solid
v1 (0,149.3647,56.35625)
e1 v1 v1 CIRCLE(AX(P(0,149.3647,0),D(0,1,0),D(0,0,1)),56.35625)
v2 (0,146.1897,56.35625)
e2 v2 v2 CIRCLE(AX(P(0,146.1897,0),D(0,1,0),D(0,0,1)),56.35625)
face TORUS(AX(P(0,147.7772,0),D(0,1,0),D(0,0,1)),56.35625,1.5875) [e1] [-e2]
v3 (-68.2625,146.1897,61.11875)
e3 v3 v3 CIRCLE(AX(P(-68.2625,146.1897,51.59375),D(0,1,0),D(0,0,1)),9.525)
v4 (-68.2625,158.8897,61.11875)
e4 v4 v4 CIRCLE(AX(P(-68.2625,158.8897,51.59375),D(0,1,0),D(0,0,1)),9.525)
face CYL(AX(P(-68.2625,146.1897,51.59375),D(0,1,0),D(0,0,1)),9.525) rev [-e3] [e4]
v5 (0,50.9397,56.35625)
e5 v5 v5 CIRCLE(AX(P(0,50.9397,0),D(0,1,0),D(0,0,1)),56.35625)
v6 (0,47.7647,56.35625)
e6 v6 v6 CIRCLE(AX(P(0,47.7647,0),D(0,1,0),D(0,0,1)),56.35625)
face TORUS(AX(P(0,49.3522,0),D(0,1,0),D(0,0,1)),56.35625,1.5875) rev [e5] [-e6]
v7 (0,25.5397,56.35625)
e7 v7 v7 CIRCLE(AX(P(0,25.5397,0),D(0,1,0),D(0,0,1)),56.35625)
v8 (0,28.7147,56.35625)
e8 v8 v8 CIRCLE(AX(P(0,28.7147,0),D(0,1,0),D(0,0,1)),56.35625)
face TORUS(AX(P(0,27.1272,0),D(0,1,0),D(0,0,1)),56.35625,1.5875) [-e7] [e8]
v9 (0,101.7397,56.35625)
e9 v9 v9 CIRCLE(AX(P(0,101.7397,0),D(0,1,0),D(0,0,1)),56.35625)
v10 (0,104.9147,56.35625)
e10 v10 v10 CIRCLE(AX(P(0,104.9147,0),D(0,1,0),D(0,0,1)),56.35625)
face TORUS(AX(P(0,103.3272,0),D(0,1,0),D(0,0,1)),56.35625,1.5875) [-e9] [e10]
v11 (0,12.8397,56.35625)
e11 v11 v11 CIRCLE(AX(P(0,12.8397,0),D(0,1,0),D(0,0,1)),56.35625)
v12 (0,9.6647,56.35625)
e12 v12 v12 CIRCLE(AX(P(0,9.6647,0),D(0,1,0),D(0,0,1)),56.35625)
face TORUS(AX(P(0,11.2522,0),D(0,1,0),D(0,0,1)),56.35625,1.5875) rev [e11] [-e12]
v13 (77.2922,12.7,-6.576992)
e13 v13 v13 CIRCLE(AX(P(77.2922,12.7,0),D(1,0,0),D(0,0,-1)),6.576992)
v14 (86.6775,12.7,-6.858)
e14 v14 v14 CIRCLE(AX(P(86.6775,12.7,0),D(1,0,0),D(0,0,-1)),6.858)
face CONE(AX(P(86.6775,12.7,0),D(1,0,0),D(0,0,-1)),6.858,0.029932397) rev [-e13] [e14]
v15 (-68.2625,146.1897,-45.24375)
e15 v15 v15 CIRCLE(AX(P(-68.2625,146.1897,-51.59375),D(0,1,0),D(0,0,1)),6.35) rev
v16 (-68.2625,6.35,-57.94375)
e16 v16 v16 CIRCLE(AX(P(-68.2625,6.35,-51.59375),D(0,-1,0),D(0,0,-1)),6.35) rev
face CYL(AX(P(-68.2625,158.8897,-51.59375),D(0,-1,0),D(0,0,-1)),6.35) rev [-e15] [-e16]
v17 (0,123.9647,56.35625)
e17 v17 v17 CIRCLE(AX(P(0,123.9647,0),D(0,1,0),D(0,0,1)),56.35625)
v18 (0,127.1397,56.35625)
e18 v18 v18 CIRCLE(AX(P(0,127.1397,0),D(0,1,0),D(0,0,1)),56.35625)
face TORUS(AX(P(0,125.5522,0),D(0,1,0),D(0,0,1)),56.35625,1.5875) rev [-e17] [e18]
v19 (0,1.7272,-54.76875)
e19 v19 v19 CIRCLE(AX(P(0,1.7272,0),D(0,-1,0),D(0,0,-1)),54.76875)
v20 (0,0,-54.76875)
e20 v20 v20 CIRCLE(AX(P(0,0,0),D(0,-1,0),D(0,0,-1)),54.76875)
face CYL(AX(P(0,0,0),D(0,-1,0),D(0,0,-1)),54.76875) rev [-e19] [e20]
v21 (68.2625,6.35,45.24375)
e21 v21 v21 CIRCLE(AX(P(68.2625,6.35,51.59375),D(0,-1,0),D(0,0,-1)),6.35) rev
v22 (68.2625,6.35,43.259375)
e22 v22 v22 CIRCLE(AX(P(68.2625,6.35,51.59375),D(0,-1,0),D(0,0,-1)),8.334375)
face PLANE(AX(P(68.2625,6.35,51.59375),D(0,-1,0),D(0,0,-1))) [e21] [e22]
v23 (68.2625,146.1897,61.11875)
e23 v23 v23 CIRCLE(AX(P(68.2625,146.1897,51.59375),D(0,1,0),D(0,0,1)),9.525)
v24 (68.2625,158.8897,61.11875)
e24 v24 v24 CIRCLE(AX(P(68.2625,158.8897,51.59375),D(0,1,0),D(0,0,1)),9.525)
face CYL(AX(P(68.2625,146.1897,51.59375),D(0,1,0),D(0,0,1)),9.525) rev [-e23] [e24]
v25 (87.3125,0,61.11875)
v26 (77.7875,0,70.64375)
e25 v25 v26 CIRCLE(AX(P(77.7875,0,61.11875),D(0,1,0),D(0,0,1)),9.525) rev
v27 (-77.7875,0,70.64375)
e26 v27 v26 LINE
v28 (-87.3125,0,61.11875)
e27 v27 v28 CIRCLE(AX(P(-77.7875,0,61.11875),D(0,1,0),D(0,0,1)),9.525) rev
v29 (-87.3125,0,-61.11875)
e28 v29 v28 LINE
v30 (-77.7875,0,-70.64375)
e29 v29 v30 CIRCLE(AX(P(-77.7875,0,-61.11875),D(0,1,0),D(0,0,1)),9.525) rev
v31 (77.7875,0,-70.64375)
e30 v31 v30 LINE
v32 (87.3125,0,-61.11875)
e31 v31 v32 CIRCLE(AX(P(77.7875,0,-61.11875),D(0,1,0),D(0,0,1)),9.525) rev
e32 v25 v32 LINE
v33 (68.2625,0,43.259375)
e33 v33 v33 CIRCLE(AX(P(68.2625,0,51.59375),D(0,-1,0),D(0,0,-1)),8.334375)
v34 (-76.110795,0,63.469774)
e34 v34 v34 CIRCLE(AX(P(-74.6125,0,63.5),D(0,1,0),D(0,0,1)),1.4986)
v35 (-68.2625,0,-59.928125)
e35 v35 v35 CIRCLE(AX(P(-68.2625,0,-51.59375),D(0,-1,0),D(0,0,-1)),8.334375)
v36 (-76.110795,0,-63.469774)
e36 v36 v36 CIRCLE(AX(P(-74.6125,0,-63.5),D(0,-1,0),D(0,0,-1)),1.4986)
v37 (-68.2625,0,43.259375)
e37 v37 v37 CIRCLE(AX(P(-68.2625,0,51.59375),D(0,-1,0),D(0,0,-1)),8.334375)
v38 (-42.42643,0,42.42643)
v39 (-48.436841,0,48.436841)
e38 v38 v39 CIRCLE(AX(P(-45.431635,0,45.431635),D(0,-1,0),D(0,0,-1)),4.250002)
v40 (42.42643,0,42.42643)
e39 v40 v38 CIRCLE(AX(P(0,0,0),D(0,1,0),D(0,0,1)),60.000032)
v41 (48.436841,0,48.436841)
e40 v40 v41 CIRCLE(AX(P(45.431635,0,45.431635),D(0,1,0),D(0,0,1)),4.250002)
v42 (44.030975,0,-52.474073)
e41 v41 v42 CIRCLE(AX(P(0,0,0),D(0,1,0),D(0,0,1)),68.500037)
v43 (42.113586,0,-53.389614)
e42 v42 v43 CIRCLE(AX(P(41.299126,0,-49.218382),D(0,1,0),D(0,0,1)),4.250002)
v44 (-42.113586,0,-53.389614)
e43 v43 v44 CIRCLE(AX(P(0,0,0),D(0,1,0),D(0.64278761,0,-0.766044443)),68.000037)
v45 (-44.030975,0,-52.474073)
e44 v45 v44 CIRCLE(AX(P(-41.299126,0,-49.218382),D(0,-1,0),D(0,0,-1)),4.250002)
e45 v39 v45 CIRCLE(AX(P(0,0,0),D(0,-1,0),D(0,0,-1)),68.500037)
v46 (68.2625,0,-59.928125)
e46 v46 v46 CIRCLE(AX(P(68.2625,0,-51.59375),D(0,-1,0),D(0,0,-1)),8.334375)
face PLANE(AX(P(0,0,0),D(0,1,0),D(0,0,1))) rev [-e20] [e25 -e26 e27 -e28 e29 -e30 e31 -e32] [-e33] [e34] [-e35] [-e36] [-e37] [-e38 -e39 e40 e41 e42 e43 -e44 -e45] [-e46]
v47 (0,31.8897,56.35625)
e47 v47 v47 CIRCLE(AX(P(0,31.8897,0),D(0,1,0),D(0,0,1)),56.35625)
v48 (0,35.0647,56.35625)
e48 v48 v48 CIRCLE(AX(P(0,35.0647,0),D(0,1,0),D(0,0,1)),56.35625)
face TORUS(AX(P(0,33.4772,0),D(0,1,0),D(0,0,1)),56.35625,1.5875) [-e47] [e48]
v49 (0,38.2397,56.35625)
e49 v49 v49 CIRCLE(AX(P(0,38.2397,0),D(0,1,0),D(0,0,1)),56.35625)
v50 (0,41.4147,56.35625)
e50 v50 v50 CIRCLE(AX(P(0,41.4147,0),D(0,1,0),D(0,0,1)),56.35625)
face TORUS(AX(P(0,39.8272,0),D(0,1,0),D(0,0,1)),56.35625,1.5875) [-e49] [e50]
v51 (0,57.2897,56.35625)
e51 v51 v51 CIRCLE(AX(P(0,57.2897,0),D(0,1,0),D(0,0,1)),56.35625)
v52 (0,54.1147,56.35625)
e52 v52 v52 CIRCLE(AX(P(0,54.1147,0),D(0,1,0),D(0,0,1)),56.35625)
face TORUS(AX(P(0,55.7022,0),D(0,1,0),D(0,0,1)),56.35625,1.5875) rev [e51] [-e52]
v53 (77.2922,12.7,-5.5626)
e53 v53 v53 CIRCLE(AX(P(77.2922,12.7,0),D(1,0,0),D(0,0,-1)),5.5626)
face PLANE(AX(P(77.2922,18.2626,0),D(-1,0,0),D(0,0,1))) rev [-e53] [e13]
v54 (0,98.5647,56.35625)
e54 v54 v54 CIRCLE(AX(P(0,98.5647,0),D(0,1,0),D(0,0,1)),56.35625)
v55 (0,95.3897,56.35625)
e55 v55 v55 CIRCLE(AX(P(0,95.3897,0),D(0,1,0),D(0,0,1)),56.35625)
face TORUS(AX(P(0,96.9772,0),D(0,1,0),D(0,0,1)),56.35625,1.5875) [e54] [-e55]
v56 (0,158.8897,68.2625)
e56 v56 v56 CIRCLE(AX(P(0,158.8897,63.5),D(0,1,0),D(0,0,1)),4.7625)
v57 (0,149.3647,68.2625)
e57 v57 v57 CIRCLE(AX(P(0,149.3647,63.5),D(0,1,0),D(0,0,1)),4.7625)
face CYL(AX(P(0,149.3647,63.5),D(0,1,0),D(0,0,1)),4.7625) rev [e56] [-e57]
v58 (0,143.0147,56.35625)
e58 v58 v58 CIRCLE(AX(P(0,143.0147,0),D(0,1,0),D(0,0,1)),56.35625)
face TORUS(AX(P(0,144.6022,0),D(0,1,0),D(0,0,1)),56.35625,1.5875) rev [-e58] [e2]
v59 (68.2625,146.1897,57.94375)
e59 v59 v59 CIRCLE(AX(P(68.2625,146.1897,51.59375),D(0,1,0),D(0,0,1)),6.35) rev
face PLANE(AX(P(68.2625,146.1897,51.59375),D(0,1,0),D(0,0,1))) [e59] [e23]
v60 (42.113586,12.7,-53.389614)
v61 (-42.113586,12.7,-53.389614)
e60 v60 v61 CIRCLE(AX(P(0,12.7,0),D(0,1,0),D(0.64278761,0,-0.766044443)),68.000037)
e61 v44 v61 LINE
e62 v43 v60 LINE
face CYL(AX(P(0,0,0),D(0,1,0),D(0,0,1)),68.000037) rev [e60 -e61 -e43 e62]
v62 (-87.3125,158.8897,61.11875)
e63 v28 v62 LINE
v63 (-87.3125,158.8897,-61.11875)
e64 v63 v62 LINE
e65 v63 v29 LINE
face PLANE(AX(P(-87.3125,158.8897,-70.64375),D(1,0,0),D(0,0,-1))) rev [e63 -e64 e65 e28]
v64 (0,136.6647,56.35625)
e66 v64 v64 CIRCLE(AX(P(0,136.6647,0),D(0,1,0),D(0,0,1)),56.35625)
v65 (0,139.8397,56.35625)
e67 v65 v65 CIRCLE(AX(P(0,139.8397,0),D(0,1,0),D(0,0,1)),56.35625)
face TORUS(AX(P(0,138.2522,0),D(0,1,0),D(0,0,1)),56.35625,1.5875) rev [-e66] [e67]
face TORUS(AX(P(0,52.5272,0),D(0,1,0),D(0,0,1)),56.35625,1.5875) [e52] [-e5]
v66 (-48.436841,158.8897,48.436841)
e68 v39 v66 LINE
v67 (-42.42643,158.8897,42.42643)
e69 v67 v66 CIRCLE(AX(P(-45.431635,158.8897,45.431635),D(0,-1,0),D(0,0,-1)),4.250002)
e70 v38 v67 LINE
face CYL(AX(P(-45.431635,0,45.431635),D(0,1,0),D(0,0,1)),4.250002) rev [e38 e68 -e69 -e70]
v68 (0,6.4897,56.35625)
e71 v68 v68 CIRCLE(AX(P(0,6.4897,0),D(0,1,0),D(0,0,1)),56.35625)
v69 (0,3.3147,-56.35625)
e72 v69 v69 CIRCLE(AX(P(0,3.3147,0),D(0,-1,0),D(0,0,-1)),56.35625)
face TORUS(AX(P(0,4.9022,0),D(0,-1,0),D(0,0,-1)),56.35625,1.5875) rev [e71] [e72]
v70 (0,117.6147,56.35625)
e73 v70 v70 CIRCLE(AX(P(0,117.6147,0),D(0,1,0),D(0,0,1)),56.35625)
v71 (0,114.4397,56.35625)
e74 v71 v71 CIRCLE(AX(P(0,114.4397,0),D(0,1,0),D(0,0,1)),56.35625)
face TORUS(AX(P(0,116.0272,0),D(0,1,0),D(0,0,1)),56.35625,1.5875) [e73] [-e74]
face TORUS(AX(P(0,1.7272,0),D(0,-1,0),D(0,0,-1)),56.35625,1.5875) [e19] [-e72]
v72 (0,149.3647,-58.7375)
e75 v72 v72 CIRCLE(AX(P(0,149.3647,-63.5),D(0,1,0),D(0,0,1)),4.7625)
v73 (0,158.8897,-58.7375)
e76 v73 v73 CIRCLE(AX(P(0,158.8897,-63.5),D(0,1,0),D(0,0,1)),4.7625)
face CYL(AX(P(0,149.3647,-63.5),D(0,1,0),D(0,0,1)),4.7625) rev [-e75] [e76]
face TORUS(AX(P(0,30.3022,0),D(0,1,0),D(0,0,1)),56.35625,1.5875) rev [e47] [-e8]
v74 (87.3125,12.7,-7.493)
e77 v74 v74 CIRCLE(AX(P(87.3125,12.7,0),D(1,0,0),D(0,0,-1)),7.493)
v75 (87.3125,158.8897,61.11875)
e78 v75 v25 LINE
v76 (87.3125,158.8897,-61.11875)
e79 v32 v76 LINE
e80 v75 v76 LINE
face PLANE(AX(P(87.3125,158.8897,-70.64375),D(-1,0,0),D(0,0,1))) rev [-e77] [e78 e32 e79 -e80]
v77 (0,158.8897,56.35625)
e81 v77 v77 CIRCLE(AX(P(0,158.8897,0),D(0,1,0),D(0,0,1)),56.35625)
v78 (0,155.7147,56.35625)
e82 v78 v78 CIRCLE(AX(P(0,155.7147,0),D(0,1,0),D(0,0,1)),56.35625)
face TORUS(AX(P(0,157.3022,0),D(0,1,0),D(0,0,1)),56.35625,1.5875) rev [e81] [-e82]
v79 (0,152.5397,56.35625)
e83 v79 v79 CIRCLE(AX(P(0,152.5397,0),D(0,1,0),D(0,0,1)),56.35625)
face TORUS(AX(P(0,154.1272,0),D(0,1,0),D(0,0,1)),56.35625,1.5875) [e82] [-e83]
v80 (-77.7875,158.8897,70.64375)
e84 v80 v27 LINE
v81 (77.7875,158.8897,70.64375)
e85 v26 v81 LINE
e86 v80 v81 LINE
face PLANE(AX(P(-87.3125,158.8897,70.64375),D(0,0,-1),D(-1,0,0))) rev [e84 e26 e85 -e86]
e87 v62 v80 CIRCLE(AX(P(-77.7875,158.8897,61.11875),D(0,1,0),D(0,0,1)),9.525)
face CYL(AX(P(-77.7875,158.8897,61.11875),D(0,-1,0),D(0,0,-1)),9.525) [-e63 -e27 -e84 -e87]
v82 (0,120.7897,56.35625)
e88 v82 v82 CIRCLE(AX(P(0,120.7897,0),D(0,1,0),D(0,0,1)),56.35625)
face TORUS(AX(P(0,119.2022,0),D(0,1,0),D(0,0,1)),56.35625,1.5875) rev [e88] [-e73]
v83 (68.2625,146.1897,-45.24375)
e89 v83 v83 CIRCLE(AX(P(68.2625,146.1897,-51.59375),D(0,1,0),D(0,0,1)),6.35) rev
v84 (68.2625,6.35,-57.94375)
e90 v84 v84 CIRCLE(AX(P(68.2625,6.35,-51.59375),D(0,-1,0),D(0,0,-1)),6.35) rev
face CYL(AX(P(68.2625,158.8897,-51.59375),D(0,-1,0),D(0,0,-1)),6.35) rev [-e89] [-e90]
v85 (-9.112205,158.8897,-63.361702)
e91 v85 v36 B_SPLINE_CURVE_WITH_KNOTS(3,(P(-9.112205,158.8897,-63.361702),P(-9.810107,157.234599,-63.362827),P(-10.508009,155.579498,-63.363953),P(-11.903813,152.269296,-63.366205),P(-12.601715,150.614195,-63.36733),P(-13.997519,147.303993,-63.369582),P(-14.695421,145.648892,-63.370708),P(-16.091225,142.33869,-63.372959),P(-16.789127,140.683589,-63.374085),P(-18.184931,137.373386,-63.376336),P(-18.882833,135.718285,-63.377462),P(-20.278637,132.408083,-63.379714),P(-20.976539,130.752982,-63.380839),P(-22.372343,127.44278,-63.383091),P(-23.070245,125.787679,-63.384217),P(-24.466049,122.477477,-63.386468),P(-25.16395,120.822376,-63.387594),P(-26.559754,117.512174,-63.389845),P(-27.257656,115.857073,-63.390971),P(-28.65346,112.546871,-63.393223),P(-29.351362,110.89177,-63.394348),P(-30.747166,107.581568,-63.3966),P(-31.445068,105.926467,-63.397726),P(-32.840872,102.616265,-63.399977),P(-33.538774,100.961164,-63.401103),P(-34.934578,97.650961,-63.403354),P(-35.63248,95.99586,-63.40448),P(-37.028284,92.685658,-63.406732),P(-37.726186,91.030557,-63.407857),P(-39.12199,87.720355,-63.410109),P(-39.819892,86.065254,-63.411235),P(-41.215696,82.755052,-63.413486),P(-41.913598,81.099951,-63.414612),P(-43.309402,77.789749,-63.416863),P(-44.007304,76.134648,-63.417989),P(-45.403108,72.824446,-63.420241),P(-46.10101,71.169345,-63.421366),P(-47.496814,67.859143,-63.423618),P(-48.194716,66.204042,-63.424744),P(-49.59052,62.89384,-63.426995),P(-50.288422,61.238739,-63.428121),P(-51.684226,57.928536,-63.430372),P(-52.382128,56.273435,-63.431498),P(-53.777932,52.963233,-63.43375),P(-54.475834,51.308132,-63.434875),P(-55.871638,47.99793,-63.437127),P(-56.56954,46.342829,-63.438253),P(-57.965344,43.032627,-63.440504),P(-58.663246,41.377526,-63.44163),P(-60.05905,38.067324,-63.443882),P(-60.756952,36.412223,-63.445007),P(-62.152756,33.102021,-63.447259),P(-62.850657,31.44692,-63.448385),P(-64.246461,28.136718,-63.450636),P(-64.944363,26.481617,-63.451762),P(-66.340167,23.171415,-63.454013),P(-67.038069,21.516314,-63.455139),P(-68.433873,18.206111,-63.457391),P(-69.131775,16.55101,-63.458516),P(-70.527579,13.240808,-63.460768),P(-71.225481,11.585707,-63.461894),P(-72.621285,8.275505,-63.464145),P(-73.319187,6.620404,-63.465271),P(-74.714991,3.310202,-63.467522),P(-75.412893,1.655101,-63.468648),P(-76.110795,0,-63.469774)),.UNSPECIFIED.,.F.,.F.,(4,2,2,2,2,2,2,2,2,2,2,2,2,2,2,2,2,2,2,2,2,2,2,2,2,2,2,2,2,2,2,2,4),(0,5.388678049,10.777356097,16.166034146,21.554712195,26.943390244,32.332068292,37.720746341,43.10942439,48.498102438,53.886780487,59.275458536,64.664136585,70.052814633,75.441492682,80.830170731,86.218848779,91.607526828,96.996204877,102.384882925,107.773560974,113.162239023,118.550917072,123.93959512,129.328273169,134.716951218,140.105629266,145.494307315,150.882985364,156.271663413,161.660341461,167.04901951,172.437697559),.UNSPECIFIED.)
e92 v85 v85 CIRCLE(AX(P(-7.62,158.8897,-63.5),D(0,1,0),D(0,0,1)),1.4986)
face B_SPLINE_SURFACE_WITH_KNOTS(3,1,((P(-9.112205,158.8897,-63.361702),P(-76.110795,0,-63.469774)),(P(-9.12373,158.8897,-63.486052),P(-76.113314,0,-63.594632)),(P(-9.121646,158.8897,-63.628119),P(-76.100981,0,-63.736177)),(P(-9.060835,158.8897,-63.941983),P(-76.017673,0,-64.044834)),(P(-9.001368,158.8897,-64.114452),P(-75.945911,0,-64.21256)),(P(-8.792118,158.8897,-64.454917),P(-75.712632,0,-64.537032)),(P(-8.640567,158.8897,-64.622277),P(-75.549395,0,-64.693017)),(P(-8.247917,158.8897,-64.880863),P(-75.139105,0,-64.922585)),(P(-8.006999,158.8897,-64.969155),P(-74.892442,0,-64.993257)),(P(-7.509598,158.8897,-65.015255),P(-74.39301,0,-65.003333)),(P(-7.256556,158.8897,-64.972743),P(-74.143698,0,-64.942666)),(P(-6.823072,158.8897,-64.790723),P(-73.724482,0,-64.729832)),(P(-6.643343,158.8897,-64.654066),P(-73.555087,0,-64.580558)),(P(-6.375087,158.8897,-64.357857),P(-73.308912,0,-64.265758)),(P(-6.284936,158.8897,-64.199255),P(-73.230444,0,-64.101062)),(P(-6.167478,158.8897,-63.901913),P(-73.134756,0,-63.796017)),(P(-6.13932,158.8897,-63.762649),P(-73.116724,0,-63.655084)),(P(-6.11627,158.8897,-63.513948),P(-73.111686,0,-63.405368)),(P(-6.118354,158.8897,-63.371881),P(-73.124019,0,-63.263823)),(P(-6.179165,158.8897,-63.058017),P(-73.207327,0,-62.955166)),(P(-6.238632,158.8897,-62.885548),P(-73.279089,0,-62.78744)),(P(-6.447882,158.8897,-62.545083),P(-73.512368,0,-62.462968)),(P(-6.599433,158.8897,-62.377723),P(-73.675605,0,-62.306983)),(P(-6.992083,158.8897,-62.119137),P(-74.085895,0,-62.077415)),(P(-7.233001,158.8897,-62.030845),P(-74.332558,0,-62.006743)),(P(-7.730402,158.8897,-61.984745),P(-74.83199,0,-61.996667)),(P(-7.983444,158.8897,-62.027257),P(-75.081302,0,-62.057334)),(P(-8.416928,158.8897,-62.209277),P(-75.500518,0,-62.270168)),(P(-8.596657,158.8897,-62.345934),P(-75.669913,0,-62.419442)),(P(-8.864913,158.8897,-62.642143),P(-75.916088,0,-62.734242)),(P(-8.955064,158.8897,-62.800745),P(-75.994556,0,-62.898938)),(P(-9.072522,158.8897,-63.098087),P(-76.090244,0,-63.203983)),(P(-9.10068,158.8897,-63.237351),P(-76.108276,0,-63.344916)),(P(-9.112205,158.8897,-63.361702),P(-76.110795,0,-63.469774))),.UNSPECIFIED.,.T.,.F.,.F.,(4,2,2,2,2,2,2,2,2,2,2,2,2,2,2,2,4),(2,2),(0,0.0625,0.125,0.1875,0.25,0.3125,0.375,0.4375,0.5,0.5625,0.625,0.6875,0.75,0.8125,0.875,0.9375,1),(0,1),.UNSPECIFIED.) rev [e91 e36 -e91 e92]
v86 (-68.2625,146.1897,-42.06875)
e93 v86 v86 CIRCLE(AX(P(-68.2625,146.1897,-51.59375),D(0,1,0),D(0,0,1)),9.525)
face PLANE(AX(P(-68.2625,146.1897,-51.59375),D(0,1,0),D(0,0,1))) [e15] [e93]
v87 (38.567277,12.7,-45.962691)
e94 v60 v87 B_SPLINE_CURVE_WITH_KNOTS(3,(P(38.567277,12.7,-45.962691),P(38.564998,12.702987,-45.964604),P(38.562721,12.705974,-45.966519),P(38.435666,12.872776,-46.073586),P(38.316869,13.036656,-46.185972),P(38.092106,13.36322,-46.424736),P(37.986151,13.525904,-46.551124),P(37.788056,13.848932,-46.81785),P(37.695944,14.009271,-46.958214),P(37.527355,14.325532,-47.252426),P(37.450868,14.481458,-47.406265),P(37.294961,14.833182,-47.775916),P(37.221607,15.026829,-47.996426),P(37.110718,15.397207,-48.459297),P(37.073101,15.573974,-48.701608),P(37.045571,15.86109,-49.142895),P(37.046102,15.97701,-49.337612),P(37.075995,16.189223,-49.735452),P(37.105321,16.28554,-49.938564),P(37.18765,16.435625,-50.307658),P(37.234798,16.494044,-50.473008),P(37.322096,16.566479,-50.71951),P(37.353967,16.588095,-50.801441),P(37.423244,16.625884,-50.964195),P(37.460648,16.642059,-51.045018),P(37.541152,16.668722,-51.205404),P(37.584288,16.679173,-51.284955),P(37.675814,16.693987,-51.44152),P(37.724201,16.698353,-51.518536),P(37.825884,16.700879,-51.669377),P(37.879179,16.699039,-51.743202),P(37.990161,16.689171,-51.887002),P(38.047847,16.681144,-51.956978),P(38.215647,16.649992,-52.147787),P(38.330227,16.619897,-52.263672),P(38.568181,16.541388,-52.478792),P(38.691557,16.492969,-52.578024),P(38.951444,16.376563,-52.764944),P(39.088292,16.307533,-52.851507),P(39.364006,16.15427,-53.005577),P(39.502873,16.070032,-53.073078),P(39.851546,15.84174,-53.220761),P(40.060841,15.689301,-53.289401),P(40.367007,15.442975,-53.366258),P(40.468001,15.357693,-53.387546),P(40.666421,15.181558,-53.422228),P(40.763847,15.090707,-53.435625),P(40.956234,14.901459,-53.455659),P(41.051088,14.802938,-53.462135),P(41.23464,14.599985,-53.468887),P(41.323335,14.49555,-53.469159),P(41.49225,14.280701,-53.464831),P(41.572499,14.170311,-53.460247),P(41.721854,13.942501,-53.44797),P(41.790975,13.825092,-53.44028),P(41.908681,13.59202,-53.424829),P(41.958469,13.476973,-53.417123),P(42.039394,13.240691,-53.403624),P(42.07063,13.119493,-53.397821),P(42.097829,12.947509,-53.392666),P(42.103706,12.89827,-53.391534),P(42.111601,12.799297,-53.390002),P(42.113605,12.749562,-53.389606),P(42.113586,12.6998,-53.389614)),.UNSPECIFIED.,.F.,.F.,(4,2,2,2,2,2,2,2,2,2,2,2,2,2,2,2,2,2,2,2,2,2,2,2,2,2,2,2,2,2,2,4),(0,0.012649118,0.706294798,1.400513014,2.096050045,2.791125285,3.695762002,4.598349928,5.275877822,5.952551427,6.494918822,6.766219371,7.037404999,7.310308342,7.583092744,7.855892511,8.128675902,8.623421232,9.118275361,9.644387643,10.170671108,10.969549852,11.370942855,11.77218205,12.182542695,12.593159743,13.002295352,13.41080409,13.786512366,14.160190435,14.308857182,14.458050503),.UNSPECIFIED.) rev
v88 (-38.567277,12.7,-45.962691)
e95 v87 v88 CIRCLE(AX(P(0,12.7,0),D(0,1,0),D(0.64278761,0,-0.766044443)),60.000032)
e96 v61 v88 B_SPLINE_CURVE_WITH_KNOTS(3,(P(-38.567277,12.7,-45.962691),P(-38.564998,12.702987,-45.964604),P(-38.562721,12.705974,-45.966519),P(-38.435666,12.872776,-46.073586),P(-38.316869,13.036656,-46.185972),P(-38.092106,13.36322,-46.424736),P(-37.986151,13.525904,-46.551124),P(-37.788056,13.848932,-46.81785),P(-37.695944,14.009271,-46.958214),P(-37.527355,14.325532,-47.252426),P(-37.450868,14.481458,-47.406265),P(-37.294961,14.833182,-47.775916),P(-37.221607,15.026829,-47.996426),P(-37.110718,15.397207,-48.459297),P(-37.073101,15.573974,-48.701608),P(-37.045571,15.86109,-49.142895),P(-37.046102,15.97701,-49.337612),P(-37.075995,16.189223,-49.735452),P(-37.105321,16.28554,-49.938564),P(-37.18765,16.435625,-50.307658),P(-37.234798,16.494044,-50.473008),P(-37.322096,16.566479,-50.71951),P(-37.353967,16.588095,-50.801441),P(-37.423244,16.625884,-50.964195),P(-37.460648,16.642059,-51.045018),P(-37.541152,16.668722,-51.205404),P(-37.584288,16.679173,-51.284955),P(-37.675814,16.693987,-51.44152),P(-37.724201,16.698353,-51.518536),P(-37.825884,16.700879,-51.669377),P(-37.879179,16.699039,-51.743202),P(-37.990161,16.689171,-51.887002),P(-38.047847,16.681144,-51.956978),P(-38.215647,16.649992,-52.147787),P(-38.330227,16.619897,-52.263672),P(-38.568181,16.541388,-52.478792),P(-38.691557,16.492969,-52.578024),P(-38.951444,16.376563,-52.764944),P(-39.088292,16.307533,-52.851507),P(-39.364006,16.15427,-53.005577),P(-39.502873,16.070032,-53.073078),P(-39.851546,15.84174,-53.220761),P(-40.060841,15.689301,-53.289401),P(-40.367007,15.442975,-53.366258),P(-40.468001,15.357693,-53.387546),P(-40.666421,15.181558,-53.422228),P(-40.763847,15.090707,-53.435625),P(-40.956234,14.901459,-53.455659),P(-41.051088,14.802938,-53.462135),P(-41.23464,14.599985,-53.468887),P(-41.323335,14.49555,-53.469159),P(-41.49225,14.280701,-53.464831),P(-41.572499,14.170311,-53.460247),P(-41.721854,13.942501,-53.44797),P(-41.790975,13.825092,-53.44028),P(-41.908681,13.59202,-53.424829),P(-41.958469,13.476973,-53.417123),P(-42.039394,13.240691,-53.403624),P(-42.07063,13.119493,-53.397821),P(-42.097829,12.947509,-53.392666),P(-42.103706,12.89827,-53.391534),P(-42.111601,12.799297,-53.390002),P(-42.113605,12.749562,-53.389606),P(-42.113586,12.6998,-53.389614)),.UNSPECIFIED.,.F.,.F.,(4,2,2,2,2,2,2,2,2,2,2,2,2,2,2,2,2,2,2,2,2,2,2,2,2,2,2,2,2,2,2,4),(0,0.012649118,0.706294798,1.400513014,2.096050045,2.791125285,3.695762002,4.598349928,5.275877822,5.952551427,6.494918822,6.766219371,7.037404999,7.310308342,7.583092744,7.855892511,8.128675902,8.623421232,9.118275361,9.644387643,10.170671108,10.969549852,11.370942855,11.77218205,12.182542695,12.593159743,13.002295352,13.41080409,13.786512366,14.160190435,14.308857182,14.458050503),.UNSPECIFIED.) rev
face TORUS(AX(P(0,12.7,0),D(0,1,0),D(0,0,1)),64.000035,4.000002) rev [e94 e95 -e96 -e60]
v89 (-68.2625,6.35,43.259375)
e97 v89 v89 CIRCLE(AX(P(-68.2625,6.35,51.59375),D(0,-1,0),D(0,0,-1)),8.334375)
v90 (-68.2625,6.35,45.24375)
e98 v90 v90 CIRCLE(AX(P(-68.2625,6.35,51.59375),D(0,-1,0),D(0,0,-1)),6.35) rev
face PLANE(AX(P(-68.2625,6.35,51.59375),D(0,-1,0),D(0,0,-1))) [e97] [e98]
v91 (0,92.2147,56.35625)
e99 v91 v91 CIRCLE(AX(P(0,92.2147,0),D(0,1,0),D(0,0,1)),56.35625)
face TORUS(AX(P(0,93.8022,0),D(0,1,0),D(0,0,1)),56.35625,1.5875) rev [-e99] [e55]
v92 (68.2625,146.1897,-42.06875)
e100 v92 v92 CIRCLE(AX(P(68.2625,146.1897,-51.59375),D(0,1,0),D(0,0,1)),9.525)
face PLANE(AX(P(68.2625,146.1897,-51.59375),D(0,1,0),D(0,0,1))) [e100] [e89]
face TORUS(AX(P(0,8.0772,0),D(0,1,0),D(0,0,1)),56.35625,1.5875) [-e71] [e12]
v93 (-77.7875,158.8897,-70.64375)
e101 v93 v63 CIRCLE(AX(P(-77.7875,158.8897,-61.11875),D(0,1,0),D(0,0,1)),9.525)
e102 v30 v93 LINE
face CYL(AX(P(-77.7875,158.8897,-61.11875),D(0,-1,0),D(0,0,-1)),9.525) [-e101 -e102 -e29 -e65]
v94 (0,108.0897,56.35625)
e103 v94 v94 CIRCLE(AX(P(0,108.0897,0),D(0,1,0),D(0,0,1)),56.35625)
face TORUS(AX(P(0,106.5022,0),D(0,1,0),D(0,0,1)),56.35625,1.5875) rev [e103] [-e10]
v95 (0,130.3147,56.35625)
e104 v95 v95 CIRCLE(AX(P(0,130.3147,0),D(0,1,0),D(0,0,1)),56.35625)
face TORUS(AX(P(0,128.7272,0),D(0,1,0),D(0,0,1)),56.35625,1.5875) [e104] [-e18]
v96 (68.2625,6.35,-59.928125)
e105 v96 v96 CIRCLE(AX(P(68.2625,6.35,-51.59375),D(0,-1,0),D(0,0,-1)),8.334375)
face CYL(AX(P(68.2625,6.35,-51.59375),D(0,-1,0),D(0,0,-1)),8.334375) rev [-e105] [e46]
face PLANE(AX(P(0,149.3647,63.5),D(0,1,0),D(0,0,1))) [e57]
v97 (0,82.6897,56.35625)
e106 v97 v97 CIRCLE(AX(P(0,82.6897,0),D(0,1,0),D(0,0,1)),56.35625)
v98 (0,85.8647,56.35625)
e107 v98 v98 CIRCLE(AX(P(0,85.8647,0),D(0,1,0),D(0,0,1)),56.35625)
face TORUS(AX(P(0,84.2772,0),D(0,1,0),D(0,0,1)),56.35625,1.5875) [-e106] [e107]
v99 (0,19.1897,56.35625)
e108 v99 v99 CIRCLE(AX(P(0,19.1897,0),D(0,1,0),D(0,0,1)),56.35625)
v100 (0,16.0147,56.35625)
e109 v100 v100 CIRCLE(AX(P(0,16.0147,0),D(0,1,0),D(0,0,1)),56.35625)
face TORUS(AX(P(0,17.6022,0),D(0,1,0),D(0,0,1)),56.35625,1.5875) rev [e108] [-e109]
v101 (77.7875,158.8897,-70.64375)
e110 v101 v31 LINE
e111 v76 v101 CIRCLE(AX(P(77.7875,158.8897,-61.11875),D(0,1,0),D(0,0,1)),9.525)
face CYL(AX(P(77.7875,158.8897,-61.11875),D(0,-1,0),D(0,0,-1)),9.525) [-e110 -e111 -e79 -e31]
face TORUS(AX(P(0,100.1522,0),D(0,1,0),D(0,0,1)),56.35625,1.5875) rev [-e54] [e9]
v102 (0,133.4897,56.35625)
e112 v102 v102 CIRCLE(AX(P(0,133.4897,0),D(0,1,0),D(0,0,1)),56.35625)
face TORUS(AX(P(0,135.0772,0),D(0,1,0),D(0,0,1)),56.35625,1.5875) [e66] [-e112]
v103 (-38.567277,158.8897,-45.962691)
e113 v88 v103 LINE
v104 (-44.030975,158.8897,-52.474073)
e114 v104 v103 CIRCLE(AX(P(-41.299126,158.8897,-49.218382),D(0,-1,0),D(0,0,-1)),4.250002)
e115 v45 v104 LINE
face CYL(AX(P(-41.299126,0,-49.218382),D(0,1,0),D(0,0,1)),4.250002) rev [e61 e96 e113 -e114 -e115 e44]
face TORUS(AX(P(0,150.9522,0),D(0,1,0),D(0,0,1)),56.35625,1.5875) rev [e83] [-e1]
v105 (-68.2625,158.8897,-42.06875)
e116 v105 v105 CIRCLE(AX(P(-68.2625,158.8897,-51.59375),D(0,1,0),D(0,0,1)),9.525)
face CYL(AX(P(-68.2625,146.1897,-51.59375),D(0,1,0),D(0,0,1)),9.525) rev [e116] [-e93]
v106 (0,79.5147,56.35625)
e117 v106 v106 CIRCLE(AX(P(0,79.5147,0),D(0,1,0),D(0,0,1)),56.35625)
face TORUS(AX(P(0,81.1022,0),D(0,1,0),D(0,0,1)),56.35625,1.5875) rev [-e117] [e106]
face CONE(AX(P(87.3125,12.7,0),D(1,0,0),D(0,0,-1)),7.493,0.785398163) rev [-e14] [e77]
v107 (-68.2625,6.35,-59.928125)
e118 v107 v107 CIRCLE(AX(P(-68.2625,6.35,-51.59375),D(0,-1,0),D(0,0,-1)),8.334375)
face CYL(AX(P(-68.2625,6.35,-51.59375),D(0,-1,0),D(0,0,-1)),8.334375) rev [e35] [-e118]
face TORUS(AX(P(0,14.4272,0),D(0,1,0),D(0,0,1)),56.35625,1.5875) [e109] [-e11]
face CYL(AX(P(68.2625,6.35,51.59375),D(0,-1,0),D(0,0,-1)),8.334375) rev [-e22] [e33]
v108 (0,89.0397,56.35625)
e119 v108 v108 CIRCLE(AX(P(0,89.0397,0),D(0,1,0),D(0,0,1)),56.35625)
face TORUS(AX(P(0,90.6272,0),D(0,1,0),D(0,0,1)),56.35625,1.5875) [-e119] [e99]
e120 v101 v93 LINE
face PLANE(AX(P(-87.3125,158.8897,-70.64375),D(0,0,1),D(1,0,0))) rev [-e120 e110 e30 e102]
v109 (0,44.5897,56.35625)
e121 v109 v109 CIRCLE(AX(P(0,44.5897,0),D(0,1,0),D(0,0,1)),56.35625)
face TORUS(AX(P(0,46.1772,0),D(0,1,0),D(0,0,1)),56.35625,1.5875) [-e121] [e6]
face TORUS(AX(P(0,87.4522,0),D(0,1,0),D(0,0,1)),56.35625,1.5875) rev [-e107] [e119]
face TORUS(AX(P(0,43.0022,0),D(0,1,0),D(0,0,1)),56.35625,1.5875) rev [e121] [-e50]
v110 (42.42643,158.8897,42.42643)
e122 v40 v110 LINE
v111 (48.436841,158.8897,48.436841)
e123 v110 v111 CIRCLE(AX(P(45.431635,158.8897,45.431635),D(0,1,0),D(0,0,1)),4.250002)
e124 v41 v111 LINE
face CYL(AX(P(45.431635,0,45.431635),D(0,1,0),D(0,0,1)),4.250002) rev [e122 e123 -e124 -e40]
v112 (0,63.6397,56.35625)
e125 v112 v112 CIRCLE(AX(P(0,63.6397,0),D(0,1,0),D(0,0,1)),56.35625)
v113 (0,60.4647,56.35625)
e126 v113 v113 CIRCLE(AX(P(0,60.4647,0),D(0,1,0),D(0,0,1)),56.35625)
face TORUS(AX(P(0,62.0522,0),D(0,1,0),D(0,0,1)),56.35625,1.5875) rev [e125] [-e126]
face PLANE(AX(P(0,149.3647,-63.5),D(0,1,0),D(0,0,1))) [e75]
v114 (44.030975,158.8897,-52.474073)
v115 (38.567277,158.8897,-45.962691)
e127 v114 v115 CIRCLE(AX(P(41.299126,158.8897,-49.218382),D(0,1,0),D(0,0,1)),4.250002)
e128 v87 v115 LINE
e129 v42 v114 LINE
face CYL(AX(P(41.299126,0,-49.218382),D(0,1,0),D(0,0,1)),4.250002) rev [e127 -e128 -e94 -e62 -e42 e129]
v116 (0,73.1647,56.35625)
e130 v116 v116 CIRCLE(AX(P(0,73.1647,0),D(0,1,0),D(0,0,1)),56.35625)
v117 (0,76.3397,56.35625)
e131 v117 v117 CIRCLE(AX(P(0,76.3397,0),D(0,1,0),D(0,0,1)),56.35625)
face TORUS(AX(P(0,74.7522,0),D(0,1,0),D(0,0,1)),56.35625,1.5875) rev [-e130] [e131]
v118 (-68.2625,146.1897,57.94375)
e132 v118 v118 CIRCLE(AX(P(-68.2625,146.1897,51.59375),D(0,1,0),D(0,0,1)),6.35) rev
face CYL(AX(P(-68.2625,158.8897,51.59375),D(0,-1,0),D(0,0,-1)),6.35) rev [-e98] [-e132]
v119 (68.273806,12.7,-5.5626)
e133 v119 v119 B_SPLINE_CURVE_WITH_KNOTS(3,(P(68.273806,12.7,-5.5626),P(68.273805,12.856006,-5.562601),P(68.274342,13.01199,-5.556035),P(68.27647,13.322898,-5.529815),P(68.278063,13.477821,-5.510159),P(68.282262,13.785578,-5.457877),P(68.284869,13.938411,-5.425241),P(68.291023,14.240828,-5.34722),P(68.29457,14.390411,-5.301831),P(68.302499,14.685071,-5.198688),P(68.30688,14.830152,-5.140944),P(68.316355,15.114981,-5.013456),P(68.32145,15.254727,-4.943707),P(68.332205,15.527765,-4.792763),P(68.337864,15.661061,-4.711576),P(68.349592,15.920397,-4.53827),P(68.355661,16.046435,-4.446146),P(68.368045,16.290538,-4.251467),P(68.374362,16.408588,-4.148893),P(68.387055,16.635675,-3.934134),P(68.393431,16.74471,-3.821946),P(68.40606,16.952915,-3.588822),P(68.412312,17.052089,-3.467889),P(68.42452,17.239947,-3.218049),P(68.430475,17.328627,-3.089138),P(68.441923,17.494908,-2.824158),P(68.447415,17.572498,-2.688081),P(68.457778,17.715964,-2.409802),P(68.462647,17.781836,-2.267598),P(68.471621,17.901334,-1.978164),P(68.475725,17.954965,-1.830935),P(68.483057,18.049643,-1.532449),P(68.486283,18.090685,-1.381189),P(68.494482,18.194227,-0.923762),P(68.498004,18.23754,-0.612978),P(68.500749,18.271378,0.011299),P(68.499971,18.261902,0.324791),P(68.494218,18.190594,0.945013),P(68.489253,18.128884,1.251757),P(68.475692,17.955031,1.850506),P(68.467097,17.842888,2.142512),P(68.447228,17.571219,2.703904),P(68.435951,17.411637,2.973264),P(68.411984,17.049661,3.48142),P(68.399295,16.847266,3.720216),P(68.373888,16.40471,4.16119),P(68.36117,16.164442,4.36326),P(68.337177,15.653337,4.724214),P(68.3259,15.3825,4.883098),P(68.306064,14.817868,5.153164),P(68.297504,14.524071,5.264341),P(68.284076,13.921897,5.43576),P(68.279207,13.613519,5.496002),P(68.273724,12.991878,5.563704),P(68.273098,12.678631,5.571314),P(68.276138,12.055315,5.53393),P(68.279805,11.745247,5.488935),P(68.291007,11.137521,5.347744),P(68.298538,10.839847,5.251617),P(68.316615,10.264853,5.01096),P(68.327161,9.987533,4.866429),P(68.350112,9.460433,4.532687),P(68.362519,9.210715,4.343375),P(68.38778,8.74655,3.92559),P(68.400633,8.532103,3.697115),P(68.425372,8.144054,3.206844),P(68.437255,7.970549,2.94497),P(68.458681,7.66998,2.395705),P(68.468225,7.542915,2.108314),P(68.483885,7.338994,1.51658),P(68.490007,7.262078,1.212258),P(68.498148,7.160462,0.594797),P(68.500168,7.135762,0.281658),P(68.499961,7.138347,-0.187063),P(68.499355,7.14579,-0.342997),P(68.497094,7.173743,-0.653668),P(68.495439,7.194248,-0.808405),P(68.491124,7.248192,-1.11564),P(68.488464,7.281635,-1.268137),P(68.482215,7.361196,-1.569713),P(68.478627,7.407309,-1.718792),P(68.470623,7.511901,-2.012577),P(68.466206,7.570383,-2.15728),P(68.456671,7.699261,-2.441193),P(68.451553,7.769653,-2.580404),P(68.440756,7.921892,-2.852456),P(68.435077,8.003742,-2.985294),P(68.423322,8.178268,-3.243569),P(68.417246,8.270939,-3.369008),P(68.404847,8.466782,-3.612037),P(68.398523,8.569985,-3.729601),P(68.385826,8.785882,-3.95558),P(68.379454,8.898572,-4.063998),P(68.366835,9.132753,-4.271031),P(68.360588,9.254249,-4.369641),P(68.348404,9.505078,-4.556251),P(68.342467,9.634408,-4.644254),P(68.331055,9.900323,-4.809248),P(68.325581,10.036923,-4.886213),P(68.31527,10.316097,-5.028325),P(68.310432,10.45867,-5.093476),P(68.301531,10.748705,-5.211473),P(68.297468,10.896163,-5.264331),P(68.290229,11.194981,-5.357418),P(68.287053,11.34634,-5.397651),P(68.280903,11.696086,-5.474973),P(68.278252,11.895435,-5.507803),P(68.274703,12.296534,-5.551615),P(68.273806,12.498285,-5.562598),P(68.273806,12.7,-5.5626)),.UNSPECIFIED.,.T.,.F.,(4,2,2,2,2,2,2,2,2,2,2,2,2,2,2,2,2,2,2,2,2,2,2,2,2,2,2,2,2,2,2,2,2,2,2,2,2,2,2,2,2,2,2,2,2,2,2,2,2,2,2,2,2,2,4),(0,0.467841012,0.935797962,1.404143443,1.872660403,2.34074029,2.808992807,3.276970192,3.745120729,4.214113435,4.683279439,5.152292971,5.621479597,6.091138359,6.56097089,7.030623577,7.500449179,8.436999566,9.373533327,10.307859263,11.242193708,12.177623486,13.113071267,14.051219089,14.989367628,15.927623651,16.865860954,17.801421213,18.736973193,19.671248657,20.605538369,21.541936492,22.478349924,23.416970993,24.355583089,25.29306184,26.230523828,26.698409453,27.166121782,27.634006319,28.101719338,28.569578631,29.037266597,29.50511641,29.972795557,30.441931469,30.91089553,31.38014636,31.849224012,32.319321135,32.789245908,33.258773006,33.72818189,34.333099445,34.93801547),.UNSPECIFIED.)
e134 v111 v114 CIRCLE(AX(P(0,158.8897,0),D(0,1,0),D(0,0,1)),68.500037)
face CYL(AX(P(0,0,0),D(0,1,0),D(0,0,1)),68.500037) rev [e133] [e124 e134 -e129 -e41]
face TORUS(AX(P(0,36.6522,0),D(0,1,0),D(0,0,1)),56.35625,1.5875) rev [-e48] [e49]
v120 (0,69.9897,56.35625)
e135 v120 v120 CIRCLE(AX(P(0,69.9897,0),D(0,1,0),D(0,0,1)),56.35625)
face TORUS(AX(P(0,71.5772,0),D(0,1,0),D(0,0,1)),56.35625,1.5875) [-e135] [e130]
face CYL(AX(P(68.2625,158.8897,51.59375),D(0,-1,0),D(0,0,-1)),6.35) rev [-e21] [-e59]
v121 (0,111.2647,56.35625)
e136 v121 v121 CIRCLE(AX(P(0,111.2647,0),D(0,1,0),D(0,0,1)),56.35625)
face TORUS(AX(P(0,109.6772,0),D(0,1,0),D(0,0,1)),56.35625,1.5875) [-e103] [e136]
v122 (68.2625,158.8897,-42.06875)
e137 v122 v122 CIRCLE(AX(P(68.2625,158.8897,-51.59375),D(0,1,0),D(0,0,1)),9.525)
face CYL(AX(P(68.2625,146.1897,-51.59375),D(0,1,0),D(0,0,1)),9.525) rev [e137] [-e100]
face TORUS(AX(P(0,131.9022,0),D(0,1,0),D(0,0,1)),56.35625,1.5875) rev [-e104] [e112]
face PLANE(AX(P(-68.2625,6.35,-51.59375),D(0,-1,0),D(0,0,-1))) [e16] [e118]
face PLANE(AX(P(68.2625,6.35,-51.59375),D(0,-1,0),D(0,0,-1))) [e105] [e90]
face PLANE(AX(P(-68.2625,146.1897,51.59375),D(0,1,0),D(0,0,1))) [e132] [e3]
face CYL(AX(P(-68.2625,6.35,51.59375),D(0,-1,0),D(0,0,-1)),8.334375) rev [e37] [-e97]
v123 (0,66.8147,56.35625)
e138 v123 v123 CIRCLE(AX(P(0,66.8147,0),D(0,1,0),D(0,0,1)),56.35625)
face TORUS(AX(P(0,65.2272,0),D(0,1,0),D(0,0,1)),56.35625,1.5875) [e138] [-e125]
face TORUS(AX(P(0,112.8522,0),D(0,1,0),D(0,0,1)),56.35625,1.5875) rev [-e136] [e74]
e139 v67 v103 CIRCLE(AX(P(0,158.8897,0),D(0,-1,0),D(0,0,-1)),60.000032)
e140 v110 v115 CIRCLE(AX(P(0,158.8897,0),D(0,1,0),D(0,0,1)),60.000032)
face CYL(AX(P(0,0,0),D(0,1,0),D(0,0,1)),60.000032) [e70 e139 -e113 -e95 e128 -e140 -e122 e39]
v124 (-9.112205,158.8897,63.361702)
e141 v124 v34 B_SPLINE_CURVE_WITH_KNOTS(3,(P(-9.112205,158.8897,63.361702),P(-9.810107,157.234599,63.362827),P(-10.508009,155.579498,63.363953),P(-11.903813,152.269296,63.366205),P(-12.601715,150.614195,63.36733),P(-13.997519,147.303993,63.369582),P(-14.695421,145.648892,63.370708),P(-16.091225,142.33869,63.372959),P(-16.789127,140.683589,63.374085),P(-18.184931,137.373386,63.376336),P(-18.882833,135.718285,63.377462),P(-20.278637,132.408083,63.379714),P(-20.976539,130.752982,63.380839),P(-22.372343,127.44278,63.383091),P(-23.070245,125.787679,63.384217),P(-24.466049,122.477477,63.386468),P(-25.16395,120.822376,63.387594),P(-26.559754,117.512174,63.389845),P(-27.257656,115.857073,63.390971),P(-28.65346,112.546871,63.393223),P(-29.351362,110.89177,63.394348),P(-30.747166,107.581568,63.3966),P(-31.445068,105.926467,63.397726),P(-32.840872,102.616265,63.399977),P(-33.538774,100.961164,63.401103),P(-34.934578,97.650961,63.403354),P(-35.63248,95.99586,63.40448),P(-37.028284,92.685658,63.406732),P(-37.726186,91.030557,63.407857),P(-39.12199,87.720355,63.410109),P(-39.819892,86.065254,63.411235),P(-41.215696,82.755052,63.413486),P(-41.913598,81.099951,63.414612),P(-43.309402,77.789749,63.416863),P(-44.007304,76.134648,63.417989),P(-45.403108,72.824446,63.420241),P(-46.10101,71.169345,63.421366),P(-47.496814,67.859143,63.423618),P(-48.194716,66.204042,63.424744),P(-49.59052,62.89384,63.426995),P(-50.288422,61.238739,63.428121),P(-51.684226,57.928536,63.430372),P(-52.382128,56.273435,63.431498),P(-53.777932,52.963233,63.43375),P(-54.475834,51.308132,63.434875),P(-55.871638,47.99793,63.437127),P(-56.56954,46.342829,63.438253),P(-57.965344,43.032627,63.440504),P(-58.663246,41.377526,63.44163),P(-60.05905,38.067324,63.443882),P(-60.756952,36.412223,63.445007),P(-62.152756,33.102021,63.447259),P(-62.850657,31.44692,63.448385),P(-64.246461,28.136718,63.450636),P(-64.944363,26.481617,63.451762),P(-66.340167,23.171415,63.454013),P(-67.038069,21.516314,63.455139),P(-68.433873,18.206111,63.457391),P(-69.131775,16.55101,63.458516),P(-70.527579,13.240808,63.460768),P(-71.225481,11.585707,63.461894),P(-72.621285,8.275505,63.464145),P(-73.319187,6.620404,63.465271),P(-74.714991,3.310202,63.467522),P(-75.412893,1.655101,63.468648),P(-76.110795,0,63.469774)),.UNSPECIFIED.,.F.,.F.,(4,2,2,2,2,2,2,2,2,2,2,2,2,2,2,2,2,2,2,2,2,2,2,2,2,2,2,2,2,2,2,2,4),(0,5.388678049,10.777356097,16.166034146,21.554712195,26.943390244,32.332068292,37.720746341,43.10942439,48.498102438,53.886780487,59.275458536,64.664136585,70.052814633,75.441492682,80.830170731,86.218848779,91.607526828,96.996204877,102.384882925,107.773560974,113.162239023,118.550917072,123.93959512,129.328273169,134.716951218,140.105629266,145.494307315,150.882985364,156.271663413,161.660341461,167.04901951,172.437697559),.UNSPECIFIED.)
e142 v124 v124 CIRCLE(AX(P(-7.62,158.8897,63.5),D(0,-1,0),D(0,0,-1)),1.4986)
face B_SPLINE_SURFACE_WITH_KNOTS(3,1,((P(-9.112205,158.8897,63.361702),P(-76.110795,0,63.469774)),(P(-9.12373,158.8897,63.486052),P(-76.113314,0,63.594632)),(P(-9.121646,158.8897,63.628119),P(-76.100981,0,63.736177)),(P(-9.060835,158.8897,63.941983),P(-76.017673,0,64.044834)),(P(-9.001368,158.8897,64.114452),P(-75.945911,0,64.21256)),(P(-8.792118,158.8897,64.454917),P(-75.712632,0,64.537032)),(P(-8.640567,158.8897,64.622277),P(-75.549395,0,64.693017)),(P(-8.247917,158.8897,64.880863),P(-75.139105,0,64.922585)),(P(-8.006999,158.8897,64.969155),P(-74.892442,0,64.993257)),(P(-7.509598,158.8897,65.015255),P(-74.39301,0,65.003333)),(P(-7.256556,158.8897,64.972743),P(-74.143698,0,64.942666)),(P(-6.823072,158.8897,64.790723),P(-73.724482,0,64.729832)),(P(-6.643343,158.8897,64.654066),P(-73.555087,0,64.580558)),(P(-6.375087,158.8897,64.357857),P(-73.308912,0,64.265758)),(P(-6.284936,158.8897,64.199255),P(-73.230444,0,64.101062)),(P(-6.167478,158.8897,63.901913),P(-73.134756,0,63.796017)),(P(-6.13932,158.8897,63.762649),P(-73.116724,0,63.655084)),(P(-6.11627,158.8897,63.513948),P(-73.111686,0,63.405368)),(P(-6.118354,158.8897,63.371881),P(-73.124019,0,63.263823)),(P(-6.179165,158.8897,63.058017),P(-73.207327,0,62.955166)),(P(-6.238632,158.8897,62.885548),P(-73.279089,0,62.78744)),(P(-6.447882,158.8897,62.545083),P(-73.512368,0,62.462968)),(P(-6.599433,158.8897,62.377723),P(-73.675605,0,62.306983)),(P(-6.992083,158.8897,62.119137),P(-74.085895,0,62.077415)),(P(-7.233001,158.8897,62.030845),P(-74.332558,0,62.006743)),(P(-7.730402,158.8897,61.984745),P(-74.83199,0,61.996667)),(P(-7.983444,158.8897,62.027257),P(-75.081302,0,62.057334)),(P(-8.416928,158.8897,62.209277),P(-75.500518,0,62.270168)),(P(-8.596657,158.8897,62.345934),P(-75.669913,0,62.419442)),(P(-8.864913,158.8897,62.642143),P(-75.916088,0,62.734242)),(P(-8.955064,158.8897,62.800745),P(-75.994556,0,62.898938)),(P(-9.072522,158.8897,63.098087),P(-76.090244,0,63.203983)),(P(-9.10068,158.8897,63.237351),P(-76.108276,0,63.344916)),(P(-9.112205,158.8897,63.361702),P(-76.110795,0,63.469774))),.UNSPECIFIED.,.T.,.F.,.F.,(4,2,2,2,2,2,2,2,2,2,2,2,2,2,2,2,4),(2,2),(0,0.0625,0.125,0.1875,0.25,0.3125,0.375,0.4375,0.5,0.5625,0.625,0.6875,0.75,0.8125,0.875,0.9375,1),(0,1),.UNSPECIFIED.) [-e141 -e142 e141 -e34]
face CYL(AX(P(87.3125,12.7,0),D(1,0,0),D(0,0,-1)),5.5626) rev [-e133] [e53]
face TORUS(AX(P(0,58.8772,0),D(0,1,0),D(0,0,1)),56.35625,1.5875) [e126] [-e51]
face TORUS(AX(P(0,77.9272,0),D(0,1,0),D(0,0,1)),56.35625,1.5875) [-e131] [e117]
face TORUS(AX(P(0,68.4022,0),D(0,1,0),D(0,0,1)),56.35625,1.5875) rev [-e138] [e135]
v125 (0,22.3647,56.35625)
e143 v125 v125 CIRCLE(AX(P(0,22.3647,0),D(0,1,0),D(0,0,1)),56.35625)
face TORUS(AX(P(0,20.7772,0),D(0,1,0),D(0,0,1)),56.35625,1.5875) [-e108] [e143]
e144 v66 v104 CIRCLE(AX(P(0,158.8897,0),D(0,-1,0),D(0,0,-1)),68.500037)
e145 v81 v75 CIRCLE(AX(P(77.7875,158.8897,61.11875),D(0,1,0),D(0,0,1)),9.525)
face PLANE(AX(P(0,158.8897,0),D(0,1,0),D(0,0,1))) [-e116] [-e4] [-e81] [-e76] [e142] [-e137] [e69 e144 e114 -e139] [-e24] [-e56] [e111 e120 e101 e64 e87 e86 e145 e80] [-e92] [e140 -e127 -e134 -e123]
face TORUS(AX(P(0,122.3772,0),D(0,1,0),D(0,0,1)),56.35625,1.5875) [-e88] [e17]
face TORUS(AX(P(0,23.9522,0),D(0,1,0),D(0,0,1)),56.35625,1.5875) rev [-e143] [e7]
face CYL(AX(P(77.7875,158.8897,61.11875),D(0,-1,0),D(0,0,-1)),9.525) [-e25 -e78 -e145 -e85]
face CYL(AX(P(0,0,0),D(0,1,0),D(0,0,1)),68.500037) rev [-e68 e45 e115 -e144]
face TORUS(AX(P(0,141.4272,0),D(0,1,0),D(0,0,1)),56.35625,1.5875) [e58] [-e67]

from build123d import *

# Parameters (mm, degrees)
SKETCH3_W           = 174.625
SKETCH3_H           = 141.2875
SKETCH3_R           = 57.94375
BOSS_EXTRUDE1_DEPTH = 158.8897
FILLET1_R           = 9.525
SKETCH4_R           = 6.35
CUT_EXTRUDE1_DEPTH  = 195.576331645
SKETCH5_R           = 9.525
CUT_EXTRUDE2_DEPTH  = 12.7
LPATTERN1_COUNT     = 24
LPATTERN1_PITCH     = 6.35
CUT_EXTRUDE3_DEPTH  = 195.576331645
SKETCH15_R          = 4.7625
CUT_EXTRUDE4_DEPTH  = 9.525
SKETCH18_R          = 8.334375
CUT_EXTRUDE5_DEPTH  = 6.35


with BuildPart() as part:
    # Sketch3 → Boss-Extrude1 (new body)
    with BuildSketch(Plane(origin=(0, 0, 0), x_dir=(1, 0, 0), z_dir=(0, 1, 0))):
        Rectangle(SKETCH3_W, SKETCH3_H)
        with Locations(Location((0, 0, 0), (0, 0, 270))):
            Circle(SKETCH3_R, mode=Mode.SUBTRACT)
    extrude(amount=BOSS_EXTRUDE1_DEPTH)

    # Fillet1
    fillet1_edges = [part.edges().sort_by_distance(p)[0] for p in [
        (87.3125, 79.44485, 70.64375),
        (-87.3125, 79.44485, 70.64375),
        (-87.3125, 79.44485, -70.64375),
        (87.3125, 79.44485, -70.64375),
    ]]
    fillet(fillet1_edges, radius=FILLET1_R)

    # Sketch4 → Cut-Extrude1 (cut, through all)
    with BuildSketch(Plane.XZ):
        with Locations(Location((-68.2625, -51.59375, 0), (0, 0, 270))):
            Circle(SKETCH4_R)
        with Locations(Location((-68.2625, 51.59375, 0), (0, 0, 270))):
            Circle(SKETCH4_R)
        with Locations(Location((68.2625, 51.59375, 0), (0, 0, 270))):
            Circle(SKETCH4_R)
        with Locations(Location((68.2625, -51.59375, 0), (0, 0, 270))):
            Circle(SKETCH4_R)
    extrude(amount=-CUT_EXTRUDE1_DEPTH, mode=Mode.SUBTRACT)

    # Sketch5 → Cut-Extrude2 (cut)
    with BuildSketch(Plane(origin=(0, 158.8897, 0), x_dir=(1, 0, 0), z_dir=(0, 1, 0))):
        with Locations(Location((68.2625, 51.59375, 0), (0, 0, 270))):
            Circle(SKETCH5_R)
        with Locations(Location((68.2625, -51.59375, 0), (0, 0, 270))):
            Circle(SKETCH5_R)
        with Locations(Location((-68.2625, -51.59375, 0), (0, 0, 270))):
            Circle(SKETCH5_R)
        with Locations(Location((-68.2625, 51.59375, 0), (0, 0, 270))):
            Circle(SKETCH5_R)
    extrude(amount=-CUT_EXTRUDE2_DEPTH, mode=Mode.SUBTRACT)

    # Sketch6 → Revolve1 (revolve)
    with BuildSketch(Plane(origin=(0, 0, 0), x_dir=(0, 0, -1), z_dir=(1, 0, 0)), mode=Mode.PRIVATE) as revolve1_sk:
        with BuildLine():
            ThreePointArc((56.35625, 155.7147), (54.76875, 154.1272), (56.35625, 152.5397))
            Line((56.35625, 152.5397), (57.94375, 152.5397))
            Line((57.94375, 152.5397), (57.94375, 157.3022))
            ThreePointArc((57.94375, 157.3022), (57.478782015, 156.179667985), (56.35625, 155.7147))
        make_face()
        with BuildLine():
            ThreePointArc((56.35625, 158.8897), (57.478782015, 158.424732015), (57.94375, 157.3022))
            Line((57.94375, 157.3022), (57.94375, 158.8897))
            Line((57.94375, 158.8897), (56.35625, 158.8897))
        make_face()
    revolve1 = revolve(revolve1_sk.sketch.rotate(Axis((0, 158.8897, 0), (0, -1, 0)), 180), axis=Axis((0, 158.8897, 0), (0, -1, 0)))

    # LPattern1: Revolve1 ×24
    with Locations(*[(0, -i * LPATTERN1_PITCH, 0) for i in range(1, LPATTERN1_COUNT)]):
        add(revolve1)

    # Sketch7 → Revolve2 (revolve)
    with BuildSketch(Plane(origin=(0, 0, 0), x_dir=(0, 0, -1), z_dir=(1, 0, 0)), mode=Mode.PRIVATE) as revolve2_sk:
        with BuildLine():
            Line((57.94375, 6.4897), (56.35625, 6.4897))
            ThreePointArc((56.35625, 6.4897), (57.478782015, 6.024732015), (57.94375, 4.9022))
            Line((57.94375, 4.9022), (57.94375, 6.4897))
        make_face()
        with BuildLine():
            Line((57.94375, 0), (57.94375, 4.9022))
            ThreePointArc((57.94375, 4.9022), (57.478782015, 3.779667985), (56.35625, 3.3147))
            ThreePointArc((56.35625, 3.3147), (55.233717985, 2.849732015), (54.76875, 1.7272))
            Line((54.76875, 1.7272), (54.76875, 0))
            Line((54.76875, 0), (57.94375, 0))
        make_face()
    revolve(revolve2_sk.sketch.rotate(Axis((0, 0, 0), (0, 1, 0)), 180), axis=Axis((0, 0, 0), (0, 1, 0)))

    # Sketch9 → Cut-Extrude3 (cut, through all)
    with BuildSketch(Plane(origin=(0, 158.8897, 0), x_dir=(1, 0, 0), z_dir=(0, 1, 0))):
        with BuildLine():
            ThreePointArc((42.426429781, -42.426429781), (59.942925664, 2.617164655), (38.567277408, 45.962691407))
            ThreePointArc((38.567277408, 45.962691407), (38.043435583, 51.950230865), (44.03097504, 52.47407269))
            ThreePointArc((44.03097504, 52.47407269), (68.434840133, 2.987929648), (48.436840667, -48.436840667))
            ThreePointArc((48.436840667, -48.436840667), (42.426429781, -48.436840667), (42.426429781, -42.426429781))
        make_face()
        with BuildLine():
            ThreePointArc((-44.03097504, 52.47407269), (-38.043435583, 51.950230865), (-38.567277408, 45.962691407))
            ThreePointArc((-38.567277408, 45.962691407), (-59.942925664, 2.617164655), (-42.426429781, -42.426429781))
            ThreePointArc((-42.426429781, -42.426429781), (-42.426429781, -48.436840667), (-48.436840667, -48.436840667))
            ThreePointArc((-48.436840667, -48.436840667), (-68.434840133, 2.987929648), (-44.03097504, 52.47407269))
        make_face()
    extrude(amount=-CUT_EXTRUDE3_DEPTH, mode=Mode.SUBTRACT)

    # Cut-Sweep1: sweep along a path in Sketch12
    with BuildLine(Plane.XZ) as cut_sweep1_path:
        ThreePointArc((-41.299126224, -49.218382048), (0, -64.250034695), (41.299126224, -49.218382048))
    # Sketch11 → Cut-Sweep1 (sweep, cut)
    with BuildSketch(Plane(origin=(0, 0, 0), x_dir=(0, 0, -1), z_dir=(1, 0, 0))):
        with BuildLine():
            Line((60.0000324, 12.7), (60.0000324, 0))
            Line((60.0000324, 0), (68.00003672, 0))
            Line((68.00003672, 0), (68.00003672, 12.7))
            ThreePointArc((68.00003672, 12.7), (64.00003456, 16.70000216), (60.0000324, 12.7))
        make_face()
    sweep(path=cut_sweep1_path.line, mode=Mode.SUBTRACT)

    # 1/4 NPT Tapped Hole1: read off the stored shape, not the designer's step
    # 1/4 NPT Tapped Hole1 outline → 1/4 NPT Tapped Hole1 (revolve, cut)
    with BuildSketch(Plane(origin=(0, 12.7, 0), x_dir=(0, 1, 0), z_dir=(0, 0, -1))):
        Polygon((0, 68.27374754), (5.5626, 68.27374754), (5.5626, 77.2922), (6.576991549, 77.2922), (6.858, 86.6775), (7.493, 87.3125), (0, 87.3125), align=None)
    revolve(axis=Axis((0, 12.7, 0), (1, 0, 0)), mode=Mode.SUBTRACT)

    # Sketch15 → Cut-Extrude4 (cut)
    with BuildSketch(Plane(origin=(0, 158.8897, 0), x_dir=(1, 0, 0), z_dir=(0, 1, 0))):
        with Locations(Location((0, 63.5, 0), (0, 0, 270))):
            Circle(SKETCH15_R)
        with Locations(Location((0, -63.5, 0), (0, 0, 270))):
            Circle(SKETCH15_R)
    extrude(amount=-CUT_EXTRUDE4_DEPTH, mode=Mode.SUBTRACT)

    # Cut-Loft1: read off the stored shape, not the designer's step
    # Cut-Loft1: loft between two sections, ruled curve by curve
    cut_loft1_from = [
        Edge.make_bspline([(-9.112204908, 158.8897, -63.361701514), (-9.123729782, 158.8897, -63.486051923), (-9.12164571, 158.8897, -63.62811853), (-9.060834867, 158.8897, -63.941983125), (-9.001367573, 158.8897, -64.114451753), (-8.792118464, 158.8897, -64.454916558), (-8.640566817, 158.8897, -64.622276863), (-8.247917484, 158.8897, -64.880862635), (-8.006999305, 158.8897, -64.969155161), (-7.509597668, 158.8897, -65.015254656), (-7.256556438, 158.8897, -64.972742599), (-6.823071566, 158.8897, -64.790723462), (-6.643343396, 158.8897, -64.654066379), (-6.375086934, 158.8897, -64.35785709), (-6.284935816, 158.8897, -64.199255189), (-6.167477913, 158.8897, -63.901912654), (-6.139319965, 158.8897, -63.762648895), (-6.116270218, 158.8897, -63.513948077), (-6.11835429, 158.8897, -63.37188147), (-6.179165133, 158.8897, -63.058016875), (-6.238632427, 158.8897, -62.885548247), (-6.447881536, 158.8897, -62.545083442), (-6.599433183, 158.8897, -62.377723137), (-6.992082516, 158.8897, -62.119137365), (-7.233000695, 158.8897, -62.030844839), (-7.730402332, 158.8897, -61.984745344), (-7.983443562, 158.8897, -62.027257401), (-8.416928434, 158.8897, -62.209276538), (-8.596656604, 158.8897, -62.345933621), (-8.864913066, 158.8897, -62.64214291), (-8.955064184, 158.8897, -62.800744811), (-9.072522087, 158.8897, -63.098087346), (-9.100680035, 158.8897, -63.237351105), (-9.112204908, 158.8897, -63.361701514)], [0, 0, 0, 0, 0.0625, 0.0625, 0.125, 0.125, 0.1875, 0.1875, 0.25, 0.25, 0.3125, 0.3125, 0.375, 0.375, 0.4375, 0.4375, 0.5, 0.5, 0.5625, 0.5625, 0.625, 0.625, 0.6875, 0.6875, 0.75, 0.75, 0.8125, 0.8125, 0.875, 0.875, 0.9375, 0.9375, 1, 1, 1, 1], 3),
    ]
    cut_loft1_to = [
        Edge.make_bspline([(-76.110795144, 0, -63.46977385), (-76.11331399, 0, -63.594631778), (-76.100980585, 0, -63.736177359), (-76.017672737, 0, -64.044833713), (-75.945911295, 0, -64.212559926), (-75.712632317, 0, -64.537032407), (-75.549395465, 0, -64.693016711), (-75.139104937, 0, -64.922585402), (-74.892442008, 0, -64.993257453), (-74.393010293, 0, -65.003332836), (-74.143697782, 0, -64.942666443), (-73.724482347, 0, -64.729831954), (-73.555087309, 0, -64.580558064), (-73.30891184, 0, -64.26575795), (-73.230444223, 0, -64.101062413), (-73.134755744, 0, -63.796017076), (-73.116723701, 0, -63.655084079), (-73.11168601, 0, -63.405368222), (-73.124019415, 0, -63.263822641), (-73.207327263, 0, -62.955166287), (-73.279088705, 0, -62.787440074), (-73.512367683, 0, -62.462967593), (-73.675604535, 0, -62.306983289), (-74.085895063, 0, -62.077414598), (-74.332557992, 0, -62.006742547), (-74.831989707, 0, -61.996667164), (-75.081302218, 0, -62.057333557), (-75.500517653, 0, -62.270168046), (-75.669912691, 0, -62.419441936), (-75.91608816, 0, -62.73424205), (-75.994555777, 0, -62.898937587), (-76.090244256, 0, -63.203982924), (-76.108276299, 0, -63.344915921), (-76.110795144, 0, -63.46977385)], [0, 0, 0, 0, 0.0625, 0.0625, 0.125, 0.125, 0.1875, 0.1875, 0.25, 0.25, 0.3125, 0.3125, 0.375, 0.375, 0.4375, 0.4375, 0.5, 0.5, 0.5625, 0.5625, 0.625, 0.625, 0.6875, 0.6875, 0.75, 0.75, 0.8125, 0.8125, 0.875, 0.875, 0.9375, 0.9375, 1, 1, 1, 1], 3),
    ]
    cut_loft1 = Solid(Shell([*[Face.make_surface_from_curves(cut_loft1_from[k], cut_loft1_to[k]) for k in range(1)], Face(Wire(cut_loft1_from)), Face(Wire(cut_loft1_to))]))
    add(cut_loft1, mode=Mode.SUBTRACT)

    # Mirror2: Cut-Loft1 across plane
    add(cut_loft1.mirror(Plane.XY), mode=Mode.SUBTRACT)

    # Sketch18 → Cut-Extrude5 (cut)
    with BuildSketch(Plane(origin=(0, 0, 0), x_dir=(-1, 0, 0), z_dir=(0, -1, 0))):
        with Locations(Location((-68.2625, -51.59375, 0), (0, 0, 90))):
            Circle(SKETCH18_R)
        with Locations(Location((-68.2625, 51.59375, 0), (0, 0, 90))):
            Circle(SKETCH18_R)
        with Locations(Location((68.2625, -51.59375, 0), (0, 0, 90))):
            Circle(SKETCH18_R)
        with Locations(Location((68.2625, 51.59375, 0), (0, 0, 90))):
            Circle(SKETCH18_R)
    extrude(amount=-CUT_EXTRUDE5_DEPTH, mode=Mode.SUBTRACT)


solid = part.part
